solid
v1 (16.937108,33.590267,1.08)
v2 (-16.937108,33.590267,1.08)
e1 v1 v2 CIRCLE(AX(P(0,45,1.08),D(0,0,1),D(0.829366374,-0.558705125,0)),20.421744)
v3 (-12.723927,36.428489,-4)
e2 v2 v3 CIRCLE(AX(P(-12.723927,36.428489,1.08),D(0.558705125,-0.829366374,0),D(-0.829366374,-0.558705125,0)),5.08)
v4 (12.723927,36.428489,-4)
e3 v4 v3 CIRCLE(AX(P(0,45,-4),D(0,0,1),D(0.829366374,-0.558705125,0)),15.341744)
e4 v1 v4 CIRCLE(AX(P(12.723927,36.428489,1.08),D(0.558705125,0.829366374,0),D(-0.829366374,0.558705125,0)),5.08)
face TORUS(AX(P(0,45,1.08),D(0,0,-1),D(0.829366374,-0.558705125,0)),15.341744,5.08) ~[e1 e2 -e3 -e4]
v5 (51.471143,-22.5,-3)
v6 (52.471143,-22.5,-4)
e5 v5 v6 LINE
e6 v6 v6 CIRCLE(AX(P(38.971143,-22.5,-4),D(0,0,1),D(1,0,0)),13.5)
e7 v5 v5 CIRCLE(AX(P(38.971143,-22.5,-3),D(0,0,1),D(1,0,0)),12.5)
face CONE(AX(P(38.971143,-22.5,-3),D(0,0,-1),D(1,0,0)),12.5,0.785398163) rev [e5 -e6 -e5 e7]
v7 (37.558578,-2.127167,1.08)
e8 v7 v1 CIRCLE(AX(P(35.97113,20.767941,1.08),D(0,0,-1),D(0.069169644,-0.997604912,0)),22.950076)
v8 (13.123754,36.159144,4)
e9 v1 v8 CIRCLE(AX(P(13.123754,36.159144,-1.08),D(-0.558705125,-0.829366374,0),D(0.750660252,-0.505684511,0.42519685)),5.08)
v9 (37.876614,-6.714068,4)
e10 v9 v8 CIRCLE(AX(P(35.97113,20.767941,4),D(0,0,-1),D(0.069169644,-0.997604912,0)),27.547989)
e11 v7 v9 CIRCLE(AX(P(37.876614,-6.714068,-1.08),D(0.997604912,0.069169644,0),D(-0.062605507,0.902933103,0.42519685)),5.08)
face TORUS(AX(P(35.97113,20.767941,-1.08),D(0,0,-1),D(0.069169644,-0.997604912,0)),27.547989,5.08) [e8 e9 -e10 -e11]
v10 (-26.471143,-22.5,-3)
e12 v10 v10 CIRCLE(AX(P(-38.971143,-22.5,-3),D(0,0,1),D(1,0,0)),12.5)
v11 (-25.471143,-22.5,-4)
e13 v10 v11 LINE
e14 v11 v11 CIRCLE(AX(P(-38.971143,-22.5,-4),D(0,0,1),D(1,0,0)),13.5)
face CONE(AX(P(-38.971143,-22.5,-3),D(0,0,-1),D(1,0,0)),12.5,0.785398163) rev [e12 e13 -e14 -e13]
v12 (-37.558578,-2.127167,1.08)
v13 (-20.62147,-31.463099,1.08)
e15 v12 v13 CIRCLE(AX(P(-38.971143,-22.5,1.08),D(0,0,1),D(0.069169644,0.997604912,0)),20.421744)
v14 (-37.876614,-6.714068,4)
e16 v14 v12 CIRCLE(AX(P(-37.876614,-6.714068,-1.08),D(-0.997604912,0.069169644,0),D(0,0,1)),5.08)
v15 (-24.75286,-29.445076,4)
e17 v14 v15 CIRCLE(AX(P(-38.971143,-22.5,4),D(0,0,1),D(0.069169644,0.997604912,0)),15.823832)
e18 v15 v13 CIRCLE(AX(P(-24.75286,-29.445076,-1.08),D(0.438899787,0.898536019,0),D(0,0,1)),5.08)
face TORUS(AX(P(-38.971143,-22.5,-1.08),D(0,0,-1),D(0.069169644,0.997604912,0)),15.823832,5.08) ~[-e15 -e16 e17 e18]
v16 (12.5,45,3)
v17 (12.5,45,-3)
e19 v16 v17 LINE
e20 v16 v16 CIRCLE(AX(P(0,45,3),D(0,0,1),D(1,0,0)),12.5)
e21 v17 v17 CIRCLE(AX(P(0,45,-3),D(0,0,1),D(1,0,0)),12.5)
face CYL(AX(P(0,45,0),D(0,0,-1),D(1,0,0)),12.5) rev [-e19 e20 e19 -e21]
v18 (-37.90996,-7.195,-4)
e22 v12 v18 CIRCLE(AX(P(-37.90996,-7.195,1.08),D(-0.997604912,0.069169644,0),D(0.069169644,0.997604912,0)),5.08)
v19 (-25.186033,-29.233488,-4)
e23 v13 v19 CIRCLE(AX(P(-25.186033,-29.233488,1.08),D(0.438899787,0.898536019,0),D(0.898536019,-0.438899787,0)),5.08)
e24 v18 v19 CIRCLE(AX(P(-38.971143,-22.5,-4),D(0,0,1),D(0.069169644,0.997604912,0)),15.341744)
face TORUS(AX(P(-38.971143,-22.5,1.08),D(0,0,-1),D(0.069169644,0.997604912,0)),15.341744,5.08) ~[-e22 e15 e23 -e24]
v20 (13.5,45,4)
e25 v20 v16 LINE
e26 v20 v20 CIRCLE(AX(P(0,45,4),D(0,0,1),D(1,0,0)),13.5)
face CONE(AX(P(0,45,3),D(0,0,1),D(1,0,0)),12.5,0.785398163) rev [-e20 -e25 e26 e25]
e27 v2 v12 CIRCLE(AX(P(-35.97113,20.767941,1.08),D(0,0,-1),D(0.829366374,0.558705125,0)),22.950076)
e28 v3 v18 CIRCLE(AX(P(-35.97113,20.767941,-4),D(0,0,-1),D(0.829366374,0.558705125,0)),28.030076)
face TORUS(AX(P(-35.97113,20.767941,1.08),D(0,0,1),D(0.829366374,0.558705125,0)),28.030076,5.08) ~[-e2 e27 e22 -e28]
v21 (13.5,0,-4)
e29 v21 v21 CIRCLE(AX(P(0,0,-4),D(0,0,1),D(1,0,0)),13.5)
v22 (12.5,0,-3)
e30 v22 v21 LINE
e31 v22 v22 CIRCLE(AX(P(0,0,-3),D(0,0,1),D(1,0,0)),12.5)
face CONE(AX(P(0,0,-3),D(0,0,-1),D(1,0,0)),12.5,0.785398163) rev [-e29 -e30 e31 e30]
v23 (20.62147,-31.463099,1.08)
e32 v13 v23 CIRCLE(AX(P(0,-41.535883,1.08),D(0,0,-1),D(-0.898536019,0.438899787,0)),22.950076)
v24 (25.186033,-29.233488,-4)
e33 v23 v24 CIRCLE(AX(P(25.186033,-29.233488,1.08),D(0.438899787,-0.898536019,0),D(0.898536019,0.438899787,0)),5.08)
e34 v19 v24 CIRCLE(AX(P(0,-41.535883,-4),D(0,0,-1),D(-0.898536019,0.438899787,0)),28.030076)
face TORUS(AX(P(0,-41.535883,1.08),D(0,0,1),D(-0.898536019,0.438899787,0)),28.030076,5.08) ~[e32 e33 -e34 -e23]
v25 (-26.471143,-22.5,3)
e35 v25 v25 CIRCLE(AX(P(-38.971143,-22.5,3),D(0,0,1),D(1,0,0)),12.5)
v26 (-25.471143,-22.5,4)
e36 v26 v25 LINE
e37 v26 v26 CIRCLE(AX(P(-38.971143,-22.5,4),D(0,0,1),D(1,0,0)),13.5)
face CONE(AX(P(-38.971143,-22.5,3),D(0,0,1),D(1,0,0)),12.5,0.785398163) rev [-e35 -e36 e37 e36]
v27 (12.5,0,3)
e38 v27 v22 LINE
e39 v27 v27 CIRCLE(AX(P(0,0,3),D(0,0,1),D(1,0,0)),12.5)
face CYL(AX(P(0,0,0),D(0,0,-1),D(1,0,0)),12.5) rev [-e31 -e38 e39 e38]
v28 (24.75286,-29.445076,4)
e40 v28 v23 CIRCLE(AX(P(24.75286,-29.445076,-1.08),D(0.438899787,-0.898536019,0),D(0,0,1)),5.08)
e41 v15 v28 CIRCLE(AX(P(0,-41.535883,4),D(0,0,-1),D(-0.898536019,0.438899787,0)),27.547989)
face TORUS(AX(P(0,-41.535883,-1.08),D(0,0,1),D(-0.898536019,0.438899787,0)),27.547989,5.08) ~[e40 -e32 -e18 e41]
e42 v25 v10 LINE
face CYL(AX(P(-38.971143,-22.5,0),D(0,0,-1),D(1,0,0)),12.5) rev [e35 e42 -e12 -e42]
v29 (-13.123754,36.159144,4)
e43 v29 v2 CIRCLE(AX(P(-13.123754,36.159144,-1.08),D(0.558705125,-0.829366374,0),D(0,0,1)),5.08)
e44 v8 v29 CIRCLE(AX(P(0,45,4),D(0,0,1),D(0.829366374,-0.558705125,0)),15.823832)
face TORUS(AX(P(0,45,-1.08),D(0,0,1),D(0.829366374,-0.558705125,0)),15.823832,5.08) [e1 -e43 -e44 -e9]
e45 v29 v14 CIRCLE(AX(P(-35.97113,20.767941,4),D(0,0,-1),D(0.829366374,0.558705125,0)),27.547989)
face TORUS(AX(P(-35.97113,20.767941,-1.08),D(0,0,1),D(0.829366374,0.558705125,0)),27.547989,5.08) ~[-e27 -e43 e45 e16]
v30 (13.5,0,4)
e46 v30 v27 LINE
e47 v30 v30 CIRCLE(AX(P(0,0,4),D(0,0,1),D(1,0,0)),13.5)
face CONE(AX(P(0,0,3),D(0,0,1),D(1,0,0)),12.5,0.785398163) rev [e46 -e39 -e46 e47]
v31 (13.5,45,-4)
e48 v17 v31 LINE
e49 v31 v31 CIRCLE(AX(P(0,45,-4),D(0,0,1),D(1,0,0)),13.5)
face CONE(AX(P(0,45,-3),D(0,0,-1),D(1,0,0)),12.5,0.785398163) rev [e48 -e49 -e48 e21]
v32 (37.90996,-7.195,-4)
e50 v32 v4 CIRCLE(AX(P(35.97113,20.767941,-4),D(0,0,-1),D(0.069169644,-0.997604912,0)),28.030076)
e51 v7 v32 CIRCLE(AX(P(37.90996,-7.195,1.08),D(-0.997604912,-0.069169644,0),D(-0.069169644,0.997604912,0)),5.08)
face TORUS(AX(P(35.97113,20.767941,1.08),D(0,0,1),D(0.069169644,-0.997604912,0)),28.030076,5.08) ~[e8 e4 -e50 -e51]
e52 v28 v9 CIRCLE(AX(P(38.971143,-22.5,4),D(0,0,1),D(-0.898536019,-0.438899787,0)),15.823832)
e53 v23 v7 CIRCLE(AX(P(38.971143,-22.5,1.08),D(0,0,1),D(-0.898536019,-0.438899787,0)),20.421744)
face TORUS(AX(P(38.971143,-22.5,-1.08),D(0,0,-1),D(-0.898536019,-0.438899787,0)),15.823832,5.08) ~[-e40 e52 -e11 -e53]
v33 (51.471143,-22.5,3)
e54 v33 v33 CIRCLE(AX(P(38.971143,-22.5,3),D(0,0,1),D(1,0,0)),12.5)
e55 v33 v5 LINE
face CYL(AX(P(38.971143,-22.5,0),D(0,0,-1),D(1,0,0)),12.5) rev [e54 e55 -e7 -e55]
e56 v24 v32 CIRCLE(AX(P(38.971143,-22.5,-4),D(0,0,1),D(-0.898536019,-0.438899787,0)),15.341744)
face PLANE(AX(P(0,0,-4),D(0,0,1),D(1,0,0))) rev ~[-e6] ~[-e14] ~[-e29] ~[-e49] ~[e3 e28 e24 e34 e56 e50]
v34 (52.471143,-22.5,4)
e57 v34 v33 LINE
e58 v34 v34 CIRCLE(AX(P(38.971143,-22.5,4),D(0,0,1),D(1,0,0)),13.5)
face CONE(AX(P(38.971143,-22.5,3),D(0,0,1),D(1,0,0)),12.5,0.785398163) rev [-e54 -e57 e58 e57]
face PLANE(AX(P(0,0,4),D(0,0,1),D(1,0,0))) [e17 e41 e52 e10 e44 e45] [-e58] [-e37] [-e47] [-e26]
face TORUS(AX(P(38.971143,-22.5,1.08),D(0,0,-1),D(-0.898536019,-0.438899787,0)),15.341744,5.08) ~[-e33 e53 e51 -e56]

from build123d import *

# Parameters (mm, degrees)
F0_R         = 12.5
F1_DEPTH     = 4
F2_R         = 5.08
F3_T2_ANGLE  = 247.9325914863
F3_T4_ANGLE  = 127.9325914863
F3_T6_ANGLE  = 247.9325914863
F3_T8_ANGLE  = 127.9325914863
F3_T10_ANGLE = 247.9325914863
F3_T12_ANGLE = 127.9325914863
F4_SIZE      = 1
F5_SIZE      = 1


# Not quite as in the source:
# - a fillet or chamfer that OpenCascade refuses, or shapes differently, is made with other operations: its cross-section is extruded or revolved along the edge and cut away or added


with BuildPart() as f1:
    # F0 (on Top) → F1 (new body, symmetric)
    with BuildSketch(Plane.XY):
        with BuildLine():
            ThreePointArc((37.5585783682, -2.1271674207), (16.095780639, 9.2929032847), (16.9371081597, 33.5902667072))
            ThreePointArc((16.9371081597, 33.5902667072), (0, 65.421744456), (-16.9371081597, 33.5902667072))
            ThreePointArc((-16.9371081597, 33.5902667072), (-16.095780639, 9.2929032847), (-37.5585783682, -2.1271674207))
            ThreePointArc((-37.5585783682, -2.1271674207), (-56.6568926588, -32.710872228), (-20.6214702085, -31.4630992865))
            ThreePointArc((-20.6214702085, -31.4630992865), (0, -18.5858065695), (20.6214702085, -31.4630992865))
            ThreePointArc((20.6214702085, -31.4630992865), (56.6568926588, -32.710872228), (37.5585783682, -2.1271674207))
        make_face()
        with Locations((-38.9711431703, -22.5)):
            Circle(F0_R, mode=Mode.SUBTRACT)
        with Locations((38.9711431703, -22.5)):
            Circle(F0_R, mode=Mode.SUBTRACT)
        Circle(F0_R, mode=Mode.SUBTRACT)
        with Locations((0, 45)):
            Circle(F0_R, mode=Mode.SUBTRACT)
    extrude(amount=F1_DEPTH, both=True)

    # F2
    f2_edges = [f1.edges().sort_by_distance(p)[0] for p in [
        (-56.656893, -32.710872, -4),
        (0, -18.585807, -4),
    ]]
    fillet(f2_edges, radius=F2_R)

    # F3: fillet of radius 5.08 on 2 edges, made by hand

    # F3_s1 → F3_t2 (revolve, cut)
    with BuildSketch(Plane(origin=(-37.2320986027, 2.5815139741, 0), x_dir=(0, 0, 1), z_dir=(0.9976049119, -0.0691696444, 0))):
        with BuildLine():
            ThreePointArc((4, 9.3178987472), (3.2083096903, 6.5945184947), (1.08, 4.7199861774))
            Line((1.08, 4.7199861774), (4, 4.7199861774))
            Line((4, 4.7199861774), (4, 9.3178987472))
        make_face()
    revolve(axis=Axis((-38.9711431703, -22.5, 4), (0, 0, 1)), revolution_arc=F3_T2_ANGLE, mode=Mode.SUBTRACT)

    # F3_s3 → F3_t4 (revolve, cut)
    with BuildSketch(Plane(origin=(-20.8517059831, 30.9531862391, 0), x_dir=(0, 0, 1), z_dir=(-0.5587051252, 0.8293663745, 0))):
        with BuildLine():
            ThreePointArc((4, 9.3178987472), (3.2083096903, 6.5945184947), (1.08, 4.7199861774))
            Line((1.08, 4.7199861774), (4, 4.7199861774))
            Line((4, 4.7199861774), (4, 9.3178987472))
        make_face()
    revolve(axis=Axis((-35.9711297502, 20.7679414443, 4), (0, 0, -1)), revolution_arc=F3_T4_ANGLE, mode=Mode.SUBTRACT)

    # F3_s5 → F3_t6 (revolve, cut)
    with BuildSketch(Plane(origin=(20.8517059831, 30.9531862391, 0), x_dir=(0, 0, 1), z_dir=(-0.5587051252, -0.8293663745, 0))):
        with BuildLine():
            ThreePointArc((1.08, 4.7199861774), (3.2083096903, 6.5945184947), (4, 9.3178987472))
            Line((4, 9.3178987472), (4, 4.7199861774))
            Line((4, 4.7199861774), (1.08, 4.7199861774))
        make_face()
    revolve(axis=Axis((0, 45, 4), (0, 0, 1)), revolution_arc=F3_T6_ANGLE, mode=Mode.SUBTRACT)

    # F3_s7 → F3_t8 (revolve, cut)
    with BuildSketch(Plane(origin=(37.2320986027, 2.5815139741, 0), x_dir=(0, 0, 1), z_dir=(0.9976049119, 0.0691696444, 0))):
        with BuildLine():
            ThreePointArc((1.08, 4.7199861774), (3.2083096903, 6.5945184947), (4, 9.3178987472))
            Line((4, 9.3178987472), (4, 4.7199861774))
            Line((4, 4.7199861774), (1.08, 4.7199861774))
        make_face()
    revolve(axis=Axis((35.9711297502, 20.7679414443, 4), (0, 0, -1)), revolution_arc=F3_T8_ANGLE, mode=Mode.SUBTRACT)

    # F3_s9 → F3_t10 (revolve, cut)
    with BuildSketch(Plane(origin=(16.3803926196, -33.5347002132, 0), x_dir=(0, 0, 1), z_dir=(-0.4388997867, 0.8985360189, 0))):
        with BuildLine():
            ThreePointArc((4, 9.3178987472), (3.2083096903, 6.5945184947), (1.08, 4.7199861774))
            Line((1.08, 4.7199861774), (4, 4.7199861774))
            Line((4, 4.7199861774), (4, 9.3178987472))
        make_face()
    revolve(axis=Axis((38.9711431703, -22.5, 4), (0, 0, 1)), revolution_arc=F3_T10_ANGLE, mode=Mode.SUBTRACT)

    # F3_s11 → F3_t12 (revolve, cut)
    with BuildSketch(Plane(origin=(-16.3803926196, -33.5347002132, 0), x_dir=(0, 0, 1), z_dir=(-0.4388997867, -0.8985360189, 0))):
        with BuildLine():
            ThreePointArc((4, 9.3178987472), (3.2083096903, 6.5945184947), (1.08, 4.7199861774))
            Line((1.08, 4.7199861774), (4, 4.7199861774))
            Line((4, 4.7199861774), (4, 9.3178987472))
        make_face()
    revolve(axis=Axis((0, -41.5358828886, 4), (0, 0, -1)), revolution_arc=F3_T12_ANGLE, mode=Mode.SUBTRACT)

    # F4
    f4_edges = [f1.edges().sort_by_distance(p)[0] for p in [
        (-51.471143, -22.5, 4),
        (-12.5, 45, 4),
        (26.471143, -22.5, 4),
        (-12.5, 0, 4),
    ]]
    chamfer(f4_edges, length=F4_SIZE)

    # F5
    f5_edges = [f1.edges().sort_by_distance(p)[0] for p in [
        (-12.5, 0, -4),
        (-12.5, 45, -4),
        (-51.471143, -22.5, -4),
        (26.471143, -22.5, -4),
    ]]
    chamfer(f5_edges, length=F5_SIZE)


solid = f1.part
